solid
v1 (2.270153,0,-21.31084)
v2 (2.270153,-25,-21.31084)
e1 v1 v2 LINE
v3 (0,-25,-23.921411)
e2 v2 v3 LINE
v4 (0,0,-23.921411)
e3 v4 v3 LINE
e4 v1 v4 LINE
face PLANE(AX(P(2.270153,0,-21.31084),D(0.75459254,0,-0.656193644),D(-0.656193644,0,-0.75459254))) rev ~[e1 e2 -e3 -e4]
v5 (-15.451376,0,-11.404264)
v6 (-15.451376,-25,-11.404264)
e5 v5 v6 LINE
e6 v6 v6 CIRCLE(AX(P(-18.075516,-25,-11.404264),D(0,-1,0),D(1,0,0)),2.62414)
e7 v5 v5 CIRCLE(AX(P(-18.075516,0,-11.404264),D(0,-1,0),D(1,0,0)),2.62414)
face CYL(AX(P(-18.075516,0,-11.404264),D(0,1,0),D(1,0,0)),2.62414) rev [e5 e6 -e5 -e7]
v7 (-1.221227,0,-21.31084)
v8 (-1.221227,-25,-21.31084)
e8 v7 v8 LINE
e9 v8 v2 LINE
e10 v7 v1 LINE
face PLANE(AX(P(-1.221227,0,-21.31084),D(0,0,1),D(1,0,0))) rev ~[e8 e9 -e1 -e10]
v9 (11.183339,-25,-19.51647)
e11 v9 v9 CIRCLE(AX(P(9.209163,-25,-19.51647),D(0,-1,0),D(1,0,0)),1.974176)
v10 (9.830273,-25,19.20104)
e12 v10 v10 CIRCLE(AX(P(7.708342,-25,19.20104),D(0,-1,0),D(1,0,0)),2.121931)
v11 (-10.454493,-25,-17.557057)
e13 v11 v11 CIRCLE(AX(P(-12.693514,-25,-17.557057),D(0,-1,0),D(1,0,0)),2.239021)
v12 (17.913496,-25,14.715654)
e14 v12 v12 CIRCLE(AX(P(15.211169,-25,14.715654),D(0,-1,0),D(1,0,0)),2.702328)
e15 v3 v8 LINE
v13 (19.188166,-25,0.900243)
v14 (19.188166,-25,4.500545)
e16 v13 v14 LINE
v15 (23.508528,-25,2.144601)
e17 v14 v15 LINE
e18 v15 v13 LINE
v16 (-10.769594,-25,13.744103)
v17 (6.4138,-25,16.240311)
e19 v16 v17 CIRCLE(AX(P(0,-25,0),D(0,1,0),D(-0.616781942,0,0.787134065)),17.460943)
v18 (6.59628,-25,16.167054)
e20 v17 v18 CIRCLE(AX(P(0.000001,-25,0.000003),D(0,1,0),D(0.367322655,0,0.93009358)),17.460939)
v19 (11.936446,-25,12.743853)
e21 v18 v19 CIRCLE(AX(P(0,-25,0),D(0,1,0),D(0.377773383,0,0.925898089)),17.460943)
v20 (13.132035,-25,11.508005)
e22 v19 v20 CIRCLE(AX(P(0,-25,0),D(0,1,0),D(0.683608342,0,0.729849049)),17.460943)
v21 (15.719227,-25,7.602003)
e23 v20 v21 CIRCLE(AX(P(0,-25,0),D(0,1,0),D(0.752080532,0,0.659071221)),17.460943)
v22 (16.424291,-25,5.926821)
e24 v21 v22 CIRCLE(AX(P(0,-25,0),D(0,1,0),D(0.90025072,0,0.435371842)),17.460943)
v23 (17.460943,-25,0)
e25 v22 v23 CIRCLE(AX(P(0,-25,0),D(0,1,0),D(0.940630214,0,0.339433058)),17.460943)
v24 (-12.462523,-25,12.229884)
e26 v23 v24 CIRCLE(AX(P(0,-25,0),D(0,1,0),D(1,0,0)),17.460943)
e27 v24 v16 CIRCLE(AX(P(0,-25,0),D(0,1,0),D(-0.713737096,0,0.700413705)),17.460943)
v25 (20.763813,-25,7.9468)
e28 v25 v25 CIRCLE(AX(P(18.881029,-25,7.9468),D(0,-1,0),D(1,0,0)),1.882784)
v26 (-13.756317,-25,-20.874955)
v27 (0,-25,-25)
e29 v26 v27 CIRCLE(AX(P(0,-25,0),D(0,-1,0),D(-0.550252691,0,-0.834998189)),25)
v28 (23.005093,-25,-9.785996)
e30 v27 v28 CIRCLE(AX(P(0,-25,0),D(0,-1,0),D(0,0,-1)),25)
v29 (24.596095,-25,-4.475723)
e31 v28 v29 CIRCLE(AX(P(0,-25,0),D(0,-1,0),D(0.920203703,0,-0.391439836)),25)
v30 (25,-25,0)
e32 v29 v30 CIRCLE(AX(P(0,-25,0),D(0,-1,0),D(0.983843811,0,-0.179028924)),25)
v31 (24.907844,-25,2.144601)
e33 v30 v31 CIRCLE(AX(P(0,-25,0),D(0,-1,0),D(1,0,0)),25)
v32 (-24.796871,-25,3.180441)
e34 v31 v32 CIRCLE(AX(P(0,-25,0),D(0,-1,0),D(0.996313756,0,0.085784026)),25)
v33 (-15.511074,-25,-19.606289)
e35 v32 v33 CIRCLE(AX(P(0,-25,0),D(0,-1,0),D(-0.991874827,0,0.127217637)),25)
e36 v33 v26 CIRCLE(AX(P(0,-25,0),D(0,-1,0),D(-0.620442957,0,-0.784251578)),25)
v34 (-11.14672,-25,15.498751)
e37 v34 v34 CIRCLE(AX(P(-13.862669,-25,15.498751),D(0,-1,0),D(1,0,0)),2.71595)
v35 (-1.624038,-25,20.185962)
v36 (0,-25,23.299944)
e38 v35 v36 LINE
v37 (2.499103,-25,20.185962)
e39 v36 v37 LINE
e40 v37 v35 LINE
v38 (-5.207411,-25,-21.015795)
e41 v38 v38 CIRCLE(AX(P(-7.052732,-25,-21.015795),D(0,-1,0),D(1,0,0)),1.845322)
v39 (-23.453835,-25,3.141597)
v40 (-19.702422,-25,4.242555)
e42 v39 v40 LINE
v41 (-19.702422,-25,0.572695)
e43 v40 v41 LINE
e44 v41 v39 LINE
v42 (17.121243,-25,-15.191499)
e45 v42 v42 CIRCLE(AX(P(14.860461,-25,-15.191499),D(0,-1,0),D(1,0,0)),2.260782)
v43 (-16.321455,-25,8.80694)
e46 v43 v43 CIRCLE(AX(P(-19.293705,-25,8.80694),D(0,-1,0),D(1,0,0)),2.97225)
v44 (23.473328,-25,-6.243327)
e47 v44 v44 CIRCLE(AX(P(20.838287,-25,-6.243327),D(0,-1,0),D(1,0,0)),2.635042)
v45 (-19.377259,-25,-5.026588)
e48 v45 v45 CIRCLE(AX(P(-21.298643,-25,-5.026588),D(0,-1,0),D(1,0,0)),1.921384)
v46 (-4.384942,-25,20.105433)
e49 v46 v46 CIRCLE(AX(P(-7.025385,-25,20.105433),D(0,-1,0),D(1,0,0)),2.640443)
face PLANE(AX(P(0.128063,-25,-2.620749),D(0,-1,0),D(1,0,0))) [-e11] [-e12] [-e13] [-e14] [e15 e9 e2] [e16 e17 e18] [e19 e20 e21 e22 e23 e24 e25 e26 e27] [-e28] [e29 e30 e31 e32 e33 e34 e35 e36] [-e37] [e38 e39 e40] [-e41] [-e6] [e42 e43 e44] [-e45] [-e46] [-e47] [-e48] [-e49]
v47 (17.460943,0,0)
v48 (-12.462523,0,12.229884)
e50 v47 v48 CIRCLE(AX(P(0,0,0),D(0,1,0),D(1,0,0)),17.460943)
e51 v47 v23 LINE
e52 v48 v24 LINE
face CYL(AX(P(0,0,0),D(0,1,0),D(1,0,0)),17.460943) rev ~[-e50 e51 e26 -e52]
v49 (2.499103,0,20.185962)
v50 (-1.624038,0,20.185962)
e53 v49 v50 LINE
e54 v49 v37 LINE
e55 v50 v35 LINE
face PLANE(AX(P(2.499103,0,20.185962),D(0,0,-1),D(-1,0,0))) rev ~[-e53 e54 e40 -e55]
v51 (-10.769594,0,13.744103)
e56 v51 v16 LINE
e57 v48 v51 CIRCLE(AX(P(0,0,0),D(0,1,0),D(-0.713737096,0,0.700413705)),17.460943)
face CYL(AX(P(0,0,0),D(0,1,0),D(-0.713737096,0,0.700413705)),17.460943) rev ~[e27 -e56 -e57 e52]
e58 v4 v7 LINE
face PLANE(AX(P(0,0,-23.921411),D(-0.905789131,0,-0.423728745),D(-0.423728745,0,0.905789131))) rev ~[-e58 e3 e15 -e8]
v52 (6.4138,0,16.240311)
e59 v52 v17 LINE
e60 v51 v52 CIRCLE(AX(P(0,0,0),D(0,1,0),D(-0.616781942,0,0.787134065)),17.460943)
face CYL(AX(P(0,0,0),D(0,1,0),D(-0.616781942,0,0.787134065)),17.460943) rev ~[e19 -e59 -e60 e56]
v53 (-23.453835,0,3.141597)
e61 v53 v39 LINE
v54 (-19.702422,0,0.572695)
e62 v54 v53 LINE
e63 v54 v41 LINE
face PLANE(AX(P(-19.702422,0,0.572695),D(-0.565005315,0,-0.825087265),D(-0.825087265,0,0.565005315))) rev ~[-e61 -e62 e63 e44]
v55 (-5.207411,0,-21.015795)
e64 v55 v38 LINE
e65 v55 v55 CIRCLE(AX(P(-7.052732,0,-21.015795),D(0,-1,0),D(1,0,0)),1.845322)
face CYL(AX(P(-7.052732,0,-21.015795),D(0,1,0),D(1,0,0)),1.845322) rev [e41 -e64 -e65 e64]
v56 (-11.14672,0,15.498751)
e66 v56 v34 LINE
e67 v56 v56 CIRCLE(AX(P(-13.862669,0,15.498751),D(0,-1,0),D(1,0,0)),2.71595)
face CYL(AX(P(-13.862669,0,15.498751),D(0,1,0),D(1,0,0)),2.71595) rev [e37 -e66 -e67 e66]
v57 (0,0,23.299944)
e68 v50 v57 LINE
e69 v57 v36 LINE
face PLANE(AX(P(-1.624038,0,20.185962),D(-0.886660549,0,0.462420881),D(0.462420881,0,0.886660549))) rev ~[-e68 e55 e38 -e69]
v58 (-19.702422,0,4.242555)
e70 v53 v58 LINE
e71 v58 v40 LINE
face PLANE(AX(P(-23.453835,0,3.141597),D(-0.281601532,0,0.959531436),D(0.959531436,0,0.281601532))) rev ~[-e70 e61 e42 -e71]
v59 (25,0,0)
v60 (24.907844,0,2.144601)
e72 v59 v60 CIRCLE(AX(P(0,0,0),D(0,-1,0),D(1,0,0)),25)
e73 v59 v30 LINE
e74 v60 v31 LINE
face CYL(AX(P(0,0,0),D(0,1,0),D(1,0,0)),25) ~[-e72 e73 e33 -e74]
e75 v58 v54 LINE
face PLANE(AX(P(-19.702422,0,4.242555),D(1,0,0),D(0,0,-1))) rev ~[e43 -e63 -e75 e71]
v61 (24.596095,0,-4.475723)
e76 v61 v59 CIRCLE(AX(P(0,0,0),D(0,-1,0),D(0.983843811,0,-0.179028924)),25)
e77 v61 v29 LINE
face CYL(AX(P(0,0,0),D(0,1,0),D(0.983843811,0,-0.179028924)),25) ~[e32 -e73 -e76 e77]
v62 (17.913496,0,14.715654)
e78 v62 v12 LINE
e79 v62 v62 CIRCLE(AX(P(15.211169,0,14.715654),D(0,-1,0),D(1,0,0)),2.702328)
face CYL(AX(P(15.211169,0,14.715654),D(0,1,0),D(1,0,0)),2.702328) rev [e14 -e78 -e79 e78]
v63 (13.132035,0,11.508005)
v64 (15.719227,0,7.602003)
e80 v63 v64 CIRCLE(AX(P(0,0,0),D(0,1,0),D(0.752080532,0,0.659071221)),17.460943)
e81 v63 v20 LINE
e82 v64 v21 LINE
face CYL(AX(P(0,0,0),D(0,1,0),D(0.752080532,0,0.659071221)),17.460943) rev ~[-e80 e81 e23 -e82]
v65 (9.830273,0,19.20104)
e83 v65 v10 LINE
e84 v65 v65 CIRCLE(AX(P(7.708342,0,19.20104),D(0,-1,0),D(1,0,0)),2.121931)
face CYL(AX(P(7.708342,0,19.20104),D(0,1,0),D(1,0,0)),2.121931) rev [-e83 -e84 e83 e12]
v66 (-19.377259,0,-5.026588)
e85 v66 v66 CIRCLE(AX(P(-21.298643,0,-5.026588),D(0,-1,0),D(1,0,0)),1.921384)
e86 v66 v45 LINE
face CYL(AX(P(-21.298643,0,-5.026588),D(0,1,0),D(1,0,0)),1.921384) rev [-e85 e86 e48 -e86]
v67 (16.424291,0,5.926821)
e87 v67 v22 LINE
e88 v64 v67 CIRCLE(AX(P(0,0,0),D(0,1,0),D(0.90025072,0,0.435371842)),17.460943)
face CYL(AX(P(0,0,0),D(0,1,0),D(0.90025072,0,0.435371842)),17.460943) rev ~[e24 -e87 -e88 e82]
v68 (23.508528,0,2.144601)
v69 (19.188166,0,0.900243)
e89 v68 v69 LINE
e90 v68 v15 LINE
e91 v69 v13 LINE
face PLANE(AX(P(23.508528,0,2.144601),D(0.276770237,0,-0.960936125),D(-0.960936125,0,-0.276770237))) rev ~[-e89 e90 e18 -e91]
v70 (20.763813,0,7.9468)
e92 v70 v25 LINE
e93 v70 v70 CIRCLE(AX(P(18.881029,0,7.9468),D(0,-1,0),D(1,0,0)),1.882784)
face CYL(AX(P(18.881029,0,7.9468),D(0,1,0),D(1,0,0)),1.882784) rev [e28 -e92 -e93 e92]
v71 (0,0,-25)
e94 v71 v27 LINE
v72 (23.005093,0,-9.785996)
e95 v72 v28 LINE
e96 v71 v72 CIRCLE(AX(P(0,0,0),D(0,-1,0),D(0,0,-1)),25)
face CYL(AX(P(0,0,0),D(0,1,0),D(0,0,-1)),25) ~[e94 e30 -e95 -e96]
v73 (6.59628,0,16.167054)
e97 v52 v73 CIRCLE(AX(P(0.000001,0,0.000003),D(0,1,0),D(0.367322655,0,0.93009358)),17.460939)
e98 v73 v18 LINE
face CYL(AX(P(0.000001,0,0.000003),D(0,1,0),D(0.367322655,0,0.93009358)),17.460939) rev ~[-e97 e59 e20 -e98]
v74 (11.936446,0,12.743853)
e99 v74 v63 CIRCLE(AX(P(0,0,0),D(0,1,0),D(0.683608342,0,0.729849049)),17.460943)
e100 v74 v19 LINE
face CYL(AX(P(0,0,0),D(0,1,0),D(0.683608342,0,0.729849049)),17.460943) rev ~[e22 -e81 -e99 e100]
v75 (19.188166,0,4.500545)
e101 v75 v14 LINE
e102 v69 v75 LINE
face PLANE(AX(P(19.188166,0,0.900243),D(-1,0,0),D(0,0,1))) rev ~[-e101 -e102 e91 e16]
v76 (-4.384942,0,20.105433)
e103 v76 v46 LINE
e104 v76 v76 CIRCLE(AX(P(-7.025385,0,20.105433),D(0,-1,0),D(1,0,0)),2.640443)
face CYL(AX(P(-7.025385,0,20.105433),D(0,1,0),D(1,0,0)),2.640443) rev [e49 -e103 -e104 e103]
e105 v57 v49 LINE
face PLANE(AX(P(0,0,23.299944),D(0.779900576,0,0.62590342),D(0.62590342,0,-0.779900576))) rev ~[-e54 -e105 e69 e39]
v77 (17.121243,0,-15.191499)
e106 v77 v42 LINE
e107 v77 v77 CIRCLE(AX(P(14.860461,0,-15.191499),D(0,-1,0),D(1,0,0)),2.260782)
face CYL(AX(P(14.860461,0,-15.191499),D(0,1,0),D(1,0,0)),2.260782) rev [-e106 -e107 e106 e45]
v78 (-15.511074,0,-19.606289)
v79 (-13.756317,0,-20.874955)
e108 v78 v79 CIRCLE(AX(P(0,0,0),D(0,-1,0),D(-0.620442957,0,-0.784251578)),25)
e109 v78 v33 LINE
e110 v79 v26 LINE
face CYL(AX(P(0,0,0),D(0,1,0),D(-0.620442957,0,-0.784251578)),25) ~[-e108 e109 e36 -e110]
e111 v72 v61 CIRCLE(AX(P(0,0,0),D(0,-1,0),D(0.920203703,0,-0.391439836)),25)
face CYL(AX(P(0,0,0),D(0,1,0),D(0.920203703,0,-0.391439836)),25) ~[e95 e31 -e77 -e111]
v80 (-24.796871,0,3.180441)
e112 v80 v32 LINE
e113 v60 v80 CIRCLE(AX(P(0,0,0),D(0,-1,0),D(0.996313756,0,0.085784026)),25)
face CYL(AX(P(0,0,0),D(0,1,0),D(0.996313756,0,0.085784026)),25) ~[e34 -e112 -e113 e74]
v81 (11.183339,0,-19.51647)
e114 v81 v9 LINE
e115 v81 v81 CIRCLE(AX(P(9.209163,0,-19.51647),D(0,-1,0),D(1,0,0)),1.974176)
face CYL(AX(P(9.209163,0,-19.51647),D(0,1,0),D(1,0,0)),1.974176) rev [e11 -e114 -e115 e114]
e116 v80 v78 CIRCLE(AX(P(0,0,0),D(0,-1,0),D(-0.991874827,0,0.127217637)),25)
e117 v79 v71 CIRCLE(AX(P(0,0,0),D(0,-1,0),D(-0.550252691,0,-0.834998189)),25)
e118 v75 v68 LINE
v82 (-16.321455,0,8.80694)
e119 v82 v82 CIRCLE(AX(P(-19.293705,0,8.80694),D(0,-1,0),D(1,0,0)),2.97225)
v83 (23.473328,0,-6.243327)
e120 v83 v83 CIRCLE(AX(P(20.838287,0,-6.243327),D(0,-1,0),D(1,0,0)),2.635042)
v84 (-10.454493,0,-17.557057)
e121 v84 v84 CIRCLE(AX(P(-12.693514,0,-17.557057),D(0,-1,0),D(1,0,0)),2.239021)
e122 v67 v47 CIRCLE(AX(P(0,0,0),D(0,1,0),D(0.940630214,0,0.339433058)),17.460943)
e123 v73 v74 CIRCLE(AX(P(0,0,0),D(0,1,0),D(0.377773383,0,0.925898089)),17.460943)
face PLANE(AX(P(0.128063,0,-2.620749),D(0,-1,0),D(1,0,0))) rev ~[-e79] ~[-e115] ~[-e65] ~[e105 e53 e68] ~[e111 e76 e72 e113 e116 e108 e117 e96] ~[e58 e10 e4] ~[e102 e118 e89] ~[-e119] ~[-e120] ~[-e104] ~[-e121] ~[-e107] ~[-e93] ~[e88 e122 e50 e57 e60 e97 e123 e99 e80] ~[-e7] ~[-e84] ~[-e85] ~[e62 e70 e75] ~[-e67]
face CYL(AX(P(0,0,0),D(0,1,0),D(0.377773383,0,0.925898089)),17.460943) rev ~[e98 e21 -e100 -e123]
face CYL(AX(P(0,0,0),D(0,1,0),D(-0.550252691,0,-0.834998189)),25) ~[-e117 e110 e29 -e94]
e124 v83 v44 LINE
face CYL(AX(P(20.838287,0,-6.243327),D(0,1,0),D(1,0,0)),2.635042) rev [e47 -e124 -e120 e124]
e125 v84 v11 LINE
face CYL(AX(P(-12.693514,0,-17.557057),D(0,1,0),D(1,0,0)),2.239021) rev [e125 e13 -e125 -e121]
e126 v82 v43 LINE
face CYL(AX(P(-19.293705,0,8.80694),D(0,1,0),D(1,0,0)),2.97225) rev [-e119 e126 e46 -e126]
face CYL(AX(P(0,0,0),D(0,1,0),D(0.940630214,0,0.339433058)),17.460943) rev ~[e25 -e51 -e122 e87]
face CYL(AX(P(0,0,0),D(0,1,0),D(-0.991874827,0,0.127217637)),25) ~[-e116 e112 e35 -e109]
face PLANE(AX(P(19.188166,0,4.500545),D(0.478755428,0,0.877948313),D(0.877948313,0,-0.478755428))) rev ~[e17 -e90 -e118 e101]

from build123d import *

# Parameters (mm, degrees)
F0_R     = 2.8256485239
F0_R_2   = 3.5765465122
F0_R_3   = 2.7439429232
F0_R_4   = 3.3466336439
F0_R_5   = 3.4276298102
F0_R_6   = 3.6294104123
F0_R_7   = 2.635041669
F0_R_8   = 2.702327646
F0_R_9   = 2.972249944
F0_R_10  = 2.6404432644
F0_R_11  = 2.6241403427
F0_R_12  = 2.7159497561
F0_R_13  = 2.2390207397
F0_R_14  = 2.2607819858
F0_R_15  = 1.9741758504
F0_R_16  = 2.1219308593
F0_R_17  = 1.8827842167
F0_R_18  = 1.845321618
F0_R_19  = 1.9213841029
F1_DEPTH = 25


with BuildPart() as f1:
    # F0 (on Front) → F1 (new body)
    with BuildSketch(Plane.XZ):
        with BuildLine():
            ThreePointArc((24.5960952758, -4.4757230907), (24.8988190673, -2.2469555075), (25, 0))
            ThreePointArc((25, 0), (24.9769503507, 1.073289886), (24.9078439057, 2.1446006555))
            ThreePointArc((24.9078439057, 2.1446006555), (0.5208838947, 24.9945730103), (-24.7968706797, 3.1804409279))
            ThreePointArc((-24.7968706797, 3.1804409279), (-23.1514874221, -9.4344385176), (-15.5110739298, -19.6062894384))
            ThreePointArc((-15.5110739298, -19.6062894384), (-13.7709472228, -14.2438804489), (-9.2095510788, -17.5570566207))
            ThreePointArc((-9.2095510788, -17.5570566207), (-10.6398306506, -20.3713740635), (-13.7563172666, -20.8749547368))
            ThreePointArc((-13.7563172666, -20.8749547368), (-7.1807427047, -23.9465432622), (0, -25))
            ThreePointArc((0, -25), (13.7903970721, -20.8524566561), (23.0050925772, -9.7859958876))
            ThreePointArc((23.0050925772, -9.7859958876), (16.860220208, -5.0514647504), (24.5960952758, -4.4757230907))
        make_face()
        with Locations((-7.0527321659, -21.0157949477)):
            Circle(F0_R, mode=Mode.SUBTRACT)
        with Locations((-18.0755164474, -11.404263787)):
            Circle(F0_R_2, mode=Mode.SUBTRACT)
        with Locations((-21.2986432016, -5.0265877508)):
            Circle(F0_R_3, mode=Mode.SUBTRACT)
        Polygon((4.266737029, -20.0934484601), (0, -25), (-2.6190390345, -20.0934484601), align=None, mode=Mode.SUBTRACT)
        with Locations((9.209163487, -19.5164699107)):
            Circle(F0_R_4, mode=Mode.SUBTRACT)
        with Locations((14.8604605347, -15.1914991438)):
            Circle(F0_R_5, mode=Mode.SUBTRACT)
        with BuildLine():
            Line((-18.9121421427, -0.7938772906), (-24.7968706797, 3.1804409279))
            Line((-24.7968706797, 3.1804409279), (-19.3468905014, 5.0684465431))
            ThreePointArc((-19.3468905014, 5.0684465431), (-21.9186154294, 11.469459375), (-15.5548330751, 8.8069401681))
            ThreePointArc((-15.5548330751, 8.8069401681), (-16.5182971087, 6.3016908172), (-18.9121421427, 5.0875890061))
            Line((-18.9121421427, 5.0875890061), (-18.9121421427, -0.7938772906))
        make_face(mode=Mode.SUBTRACT)
        with Locations((-7.0253848098, 20.105432719)):
            Circle(F0_R_6, mode=Mode.SUBTRACT)
        with BuildLine():
            Line((19.5046194307, 4.8279847044), (24.9078439057, 2.1446006555))
            Line((24.9078439057, 2.1446006555), (18.717167899, 0))
            Line((18.717167899, 0), (18.717167899, 4.7704775792))
            ThreePointArc((18.717167899, 4.7704775792), (17.4488389654, 5.1069570809), (16.4242905584, 5.9268212774))
            ThreePointArc((16.4242905584, 5.9268212774), (17.1998275024, 3.0083990244), (17.4609430101, 0))
            ThreePointArc((17.4609430101, 0), (-6.6059492578, -16.1631050607), (-12.4625227562, 12.2298837833))
            ThreePointArc((-12.4625227562, 12.2298837833), (-16.8312529103, 17.4566617233), (-10.3065616702, 15.4987508431))
            ThreePointArc((-10.3065616702, 15.4987508431), (-10.4242678564, 14.5913936768), (-10.7695943307, 13.7441030538))
            ThreePointArc((-10.7695943307, 13.7441030538), (-2.5101792072, 17.2795697617), (6.4137999623, 16.2403109836))
            ThreePointArc((6.4137999623, 16.2403109836), (5.9393579148, 21.9051948536), (10.9397131516, 19.2010402679))
            ThreePointArc((10.9397131516, 19.2010402679), (9.558784183, 16.551960716), (6.5962795119, 16.1670537638))
            ThreePointArc((6.5962795119, 16.1670537638), (9.4231129686, 14.6999820674), (11.9364463054, 12.7438526513))
            ThreePointArc((11.9364463054, 12.7438526513), (14.1879258767, 18.3986934482), (19.0337079573, 14.7156538442))
            ThreePointArc((19.0337079573, 14.7156538442), (17.0365778867, 11.3571292026), (13.1320353046, 11.5080050208))
            ThreePointArc((13.1320353046, 11.5080050208), (14.5572332623, 9.6421725015), (15.7192265164, 7.6020029287))
            ThreePointArc((15.7192265164, 7.6020029287), (18.7083751896, 11.1226574982), (22.0615752041, 7.9468004405))
            ThreePointArc((22.0615752041, 7.9468004405), (21.3406257649, 5.9303038237), (19.5046194307, 4.8279847044))
        make_face(mode=Mode.SUBTRACT)
        Polygon((3.975788597, 19.6694843471), (-2.6190390345, 19.6694843471), (0, 24.2276750505), align=None, mode=Mode.SUBTRACT)
        with BuildLine():
            ThreePointArc((23.0050925772, -9.7859958876), (23.9482362722, -7.1750943862), (24.5960952758, -4.4757230907))
            ThreePointArc((24.5960952758, -4.4757230907), (16.860220208, -5.0514647504), (23.0050925772, -9.7859958876))
        make_face()
        with Locations((20.8382867277, -6.2433271669)):
            Circle(F0_R_7, mode=Mode.SUBTRACT)
        with BuildLine():
            ThreePointArc((11.9364463054, 12.7438526513), (12.5494630323, 12.1406551883), (13.1320353046, 11.5080050208))
            ThreePointArc((13.1320353046, 11.5080050208), (17.0365778867, 11.3571292026), (19.0337079573, 14.7156538442))
            ThreePointArc((19.0337079573, 14.7156538442), (14.1879258767, 18.3986934482), (11.9364463054, 12.7438526513))
        make_face()
        with Locations((15.2111686766, 14.7156538442)):
            Circle(F0_R_8, mode=Mode.SUBTRACT)
        with BuildLine():
            ThreePointArc((-15.5548330751, 8.8069401681), (-21.9186154294, 11.469459375), (-19.3468905014, 5.0684465431))
            Line((-19.3468905014, 5.0684465431), (-18.9121421427, 5.2190539427))
            Line((-18.9121421427, 5.2190539427), (-18.9121421427, 5.0875890061))
            ThreePointArc((-18.9121421427, 5.0875890061), (-16.5182971087, 6.3016908172), (-15.5548330751, 8.8069401681))
        make_face()
        with Locations((-19.2937050015, 8.8069401681)):
            Circle(F0_R_9, mode=Mode.SUBTRACT)
        with Locations((-7.0253848098, 20.105432719)):
            Circle(F0_R_6)
        with Locations((-7.0253848098, 20.105432719)):
            Circle(F0_R_10, mode=Mode.SUBTRACT)
        with Locations((-18.0755164474, -11.404263787)):
            Circle(F0_R_2)
        with Locations((-18.0755164474, -11.404263787)):
            Circle(F0_R_11, mode=Mode.SUBTRACT)
        with BuildLine():
            ThreePointArc((-10.3065616702, 15.4987508431), (-16.8312529103, 17.4566617233), (-12.4625227562, 12.2298837833))
            ThreePointArc((-12.4625227562, 12.2298837833), (-11.6407057812, 13.0145495395), (-10.7695943307, 13.7441030538))
            ThreePointArc((-10.7695943307, 13.7441030538), (-10.4242678564, 14.5913936768), (-10.3065616702, 15.4987508431))
        make_face()
        with Locations((-13.8626694679, 15.4987508431)):
            Circle(F0_R_12, mode=Mode.SUBTRACT)
        with BuildLine():
            ThreePointArc((-9.2095510788, -17.5570566207), (-13.7709472228, -14.2438804489), (-15.5110739298, -19.6062894384))
            ThreePointArc((-15.5110739298, -19.6062894384), (-14.6474374814, -20.2596291977), (-13.7563172666, -20.8749547368))
            ThreePointArc((-13.7563172666, -20.8749547368), (-10.6398306506, -20.3713740635), (-9.2095510788, -17.5570566207))
        make_face()
        with Locations((-12.6935141161, -17.5570566207)):
            Circle(F0_R_13, mode=Mode.SUBTRACT)
        with Locations((14.8604605347, -15.1914991438)):
            Circle(F0_R_5)
        with Locations((14.8604605347, -15.1914991438)):
            Circle(F0_R_14, mode=Mode.SUBTRACT)
        with Locations((9.209163487, -19.5164699107)):
            Circle(F0_R_4)
        with Locations((9.209163487, -19.5164699107)):
            Circle(F0_R_15, mode=Mode.SUBTRACT)
        with BuildLine():
            ThreePointArc((6.4137999623, 16.2403109836), (6.5051428606, 16.2039392484), (6.5962795119, 16.1670537638))
            ThreePointArc((6.5962795119, 16.1670537638), (9.558784183, 16.551960716), (10.9397131516, 19.2010402679))
            ThreePointArc((10.9397131516, 19.2010402679), (5.9393579148, 21.9051948536), (6.4137999623, 16.2403109836))
        make_face()
        with Locations((7.7083422802, 19.2010402679)):
            Circle(F0_R_16, mode=Mode.SUBTRACT)
        with BuildLine():
            Line((18.717167899, 5.2190539427), (19.5046194307, 4.8279847044))
            ThreePointArc((19.5046194307, 4.8279847044), (21.3406257649, 5.9303038237), (22.0615752041, 7.9468004405))
            ThreePointArc((22.0615752041, 7.9468004405), (18.7083751896, 11.1226574982), (15.7192265164, 7.6020029287))
            ThreePointArc((15.7192265164, 7.6020029287), (16.0935695505, 6.7735920991), (16.4242905584, 5.9268212774))
            ThreePointArc((16.4242905584, 5.9268212774), (17.4488389654, 5.1069570809), (18.717167899, 4.7704775792))
            Line((18.717167899, 4.7704775792), (18.717167899, 5.2190539427))
        make_face()
        with Locations((18.8810285181, 7.9468004405)):
            Circle(F0_R_17, mode=Mode.SUBTRACT)
        with Locations((-7.0527321659, -21.0157949477)):
            Circle(F0_R)
        with Locations((-7.0527321659, -21.0157949477)):
            Circle(F0_R_18, mode=Mode.SUBTRACT)
        with Locations((-21.2986432016, -5.0265877508)):
            Circle(F0_R_3)
        with Locations((-21.2986432016, -5.0265877508)):
            Circle(F0_R_19, mode=Mode.SUBTRACT)
        with BuildLine():
            Line((-19.3468905014, 5.0684465431), (-24.7968706797, 3.1804409279))
            Line((-24.7968706797, 3.1804409279), (-18.9121421427, -0.7938772906))
            Line((-18.9121421427, -0.7938772906), (-18.9121421427, 5.0875890061))
            ThreePointArc((-18.9121421427, 5.0875890061), (-19.1292375855, 5.0716873319), (-19.3468905014, 5.0684465431))
        make_face()
        Polygon((-19.7024215013, 4.2425552383), (-19.7024215013, 0.5726945819), (-23.453835398, 3.1415971462), align=None, mode=Mode.SUBTRACT)
        Polygon((-2.6190390345, -20.0934484601), (0, -25), (4.266737029, -20.0934484601), align=None)
        Polygon((0, -23.921410939), (-1.2212268775, -21.310839802), (2.2701525595, -21.310839802), align=None, mode=Mode.SUBTRACT)
        with BuildLine():
            Line((18.717167899, 0), (24.9078439057, 2.1446006555))
            Line((24.9078439057, 2.1446006555), (19.5046194307, 4.8279847044))
            ThreePointArc((19.5046194307, 4.8279847044), (19.1126850593, 4.774701377), (18.717167899, 4.7704775792))
            Line((18.717167899, 4.7704775792), (18.717167899, 0))
        make_face()
        Polygon((23.5085282475, 2.1446006555), (19.1881656647, 0.9002434672), (19.1881656647, 4.50054463), align=None, mode=Mode.SUBTRACT)
        Polygon((0, 24.2276750505), (-2.6190390345, 19.6694843471), (3.975788597, 19.6694843471), align=None)
        Polygon((2.4991026148, 20.1859623194), (-1.6240375116, 20.1859623194), (0, 23.2999436557), align=None, mode=Mode.SUBTRACT)
        with BuildLine():
            ThreePointArc((18.717167899, 4.7704775792), (19.1126850593, 4.774701377), (19.5046194307, 4.8279847044))
            Line((19.5046194307, 4.8279847044), (18.717167899, 5.2190539427))
            Line((18.717167899, 5.2190539427), (18.717167899, 4.7704775792))
        make_face()
        with BuildLine():
            Line((-18.9121421427, 5.2190539427), (-19.3468905014, 5.0684465431))
            ThreePointArc((-19.3468905014, 5.0684465431), (-19.1292375855, 5.0716873319), (-18.9121421427, 5.0875890061))
            Line((-18.9121421427, 5.0875890061), (-18.9121421427, 5.2190539427))
        make_face()
    extrude(amount=F1_DEPTH)


solid = f1.part
